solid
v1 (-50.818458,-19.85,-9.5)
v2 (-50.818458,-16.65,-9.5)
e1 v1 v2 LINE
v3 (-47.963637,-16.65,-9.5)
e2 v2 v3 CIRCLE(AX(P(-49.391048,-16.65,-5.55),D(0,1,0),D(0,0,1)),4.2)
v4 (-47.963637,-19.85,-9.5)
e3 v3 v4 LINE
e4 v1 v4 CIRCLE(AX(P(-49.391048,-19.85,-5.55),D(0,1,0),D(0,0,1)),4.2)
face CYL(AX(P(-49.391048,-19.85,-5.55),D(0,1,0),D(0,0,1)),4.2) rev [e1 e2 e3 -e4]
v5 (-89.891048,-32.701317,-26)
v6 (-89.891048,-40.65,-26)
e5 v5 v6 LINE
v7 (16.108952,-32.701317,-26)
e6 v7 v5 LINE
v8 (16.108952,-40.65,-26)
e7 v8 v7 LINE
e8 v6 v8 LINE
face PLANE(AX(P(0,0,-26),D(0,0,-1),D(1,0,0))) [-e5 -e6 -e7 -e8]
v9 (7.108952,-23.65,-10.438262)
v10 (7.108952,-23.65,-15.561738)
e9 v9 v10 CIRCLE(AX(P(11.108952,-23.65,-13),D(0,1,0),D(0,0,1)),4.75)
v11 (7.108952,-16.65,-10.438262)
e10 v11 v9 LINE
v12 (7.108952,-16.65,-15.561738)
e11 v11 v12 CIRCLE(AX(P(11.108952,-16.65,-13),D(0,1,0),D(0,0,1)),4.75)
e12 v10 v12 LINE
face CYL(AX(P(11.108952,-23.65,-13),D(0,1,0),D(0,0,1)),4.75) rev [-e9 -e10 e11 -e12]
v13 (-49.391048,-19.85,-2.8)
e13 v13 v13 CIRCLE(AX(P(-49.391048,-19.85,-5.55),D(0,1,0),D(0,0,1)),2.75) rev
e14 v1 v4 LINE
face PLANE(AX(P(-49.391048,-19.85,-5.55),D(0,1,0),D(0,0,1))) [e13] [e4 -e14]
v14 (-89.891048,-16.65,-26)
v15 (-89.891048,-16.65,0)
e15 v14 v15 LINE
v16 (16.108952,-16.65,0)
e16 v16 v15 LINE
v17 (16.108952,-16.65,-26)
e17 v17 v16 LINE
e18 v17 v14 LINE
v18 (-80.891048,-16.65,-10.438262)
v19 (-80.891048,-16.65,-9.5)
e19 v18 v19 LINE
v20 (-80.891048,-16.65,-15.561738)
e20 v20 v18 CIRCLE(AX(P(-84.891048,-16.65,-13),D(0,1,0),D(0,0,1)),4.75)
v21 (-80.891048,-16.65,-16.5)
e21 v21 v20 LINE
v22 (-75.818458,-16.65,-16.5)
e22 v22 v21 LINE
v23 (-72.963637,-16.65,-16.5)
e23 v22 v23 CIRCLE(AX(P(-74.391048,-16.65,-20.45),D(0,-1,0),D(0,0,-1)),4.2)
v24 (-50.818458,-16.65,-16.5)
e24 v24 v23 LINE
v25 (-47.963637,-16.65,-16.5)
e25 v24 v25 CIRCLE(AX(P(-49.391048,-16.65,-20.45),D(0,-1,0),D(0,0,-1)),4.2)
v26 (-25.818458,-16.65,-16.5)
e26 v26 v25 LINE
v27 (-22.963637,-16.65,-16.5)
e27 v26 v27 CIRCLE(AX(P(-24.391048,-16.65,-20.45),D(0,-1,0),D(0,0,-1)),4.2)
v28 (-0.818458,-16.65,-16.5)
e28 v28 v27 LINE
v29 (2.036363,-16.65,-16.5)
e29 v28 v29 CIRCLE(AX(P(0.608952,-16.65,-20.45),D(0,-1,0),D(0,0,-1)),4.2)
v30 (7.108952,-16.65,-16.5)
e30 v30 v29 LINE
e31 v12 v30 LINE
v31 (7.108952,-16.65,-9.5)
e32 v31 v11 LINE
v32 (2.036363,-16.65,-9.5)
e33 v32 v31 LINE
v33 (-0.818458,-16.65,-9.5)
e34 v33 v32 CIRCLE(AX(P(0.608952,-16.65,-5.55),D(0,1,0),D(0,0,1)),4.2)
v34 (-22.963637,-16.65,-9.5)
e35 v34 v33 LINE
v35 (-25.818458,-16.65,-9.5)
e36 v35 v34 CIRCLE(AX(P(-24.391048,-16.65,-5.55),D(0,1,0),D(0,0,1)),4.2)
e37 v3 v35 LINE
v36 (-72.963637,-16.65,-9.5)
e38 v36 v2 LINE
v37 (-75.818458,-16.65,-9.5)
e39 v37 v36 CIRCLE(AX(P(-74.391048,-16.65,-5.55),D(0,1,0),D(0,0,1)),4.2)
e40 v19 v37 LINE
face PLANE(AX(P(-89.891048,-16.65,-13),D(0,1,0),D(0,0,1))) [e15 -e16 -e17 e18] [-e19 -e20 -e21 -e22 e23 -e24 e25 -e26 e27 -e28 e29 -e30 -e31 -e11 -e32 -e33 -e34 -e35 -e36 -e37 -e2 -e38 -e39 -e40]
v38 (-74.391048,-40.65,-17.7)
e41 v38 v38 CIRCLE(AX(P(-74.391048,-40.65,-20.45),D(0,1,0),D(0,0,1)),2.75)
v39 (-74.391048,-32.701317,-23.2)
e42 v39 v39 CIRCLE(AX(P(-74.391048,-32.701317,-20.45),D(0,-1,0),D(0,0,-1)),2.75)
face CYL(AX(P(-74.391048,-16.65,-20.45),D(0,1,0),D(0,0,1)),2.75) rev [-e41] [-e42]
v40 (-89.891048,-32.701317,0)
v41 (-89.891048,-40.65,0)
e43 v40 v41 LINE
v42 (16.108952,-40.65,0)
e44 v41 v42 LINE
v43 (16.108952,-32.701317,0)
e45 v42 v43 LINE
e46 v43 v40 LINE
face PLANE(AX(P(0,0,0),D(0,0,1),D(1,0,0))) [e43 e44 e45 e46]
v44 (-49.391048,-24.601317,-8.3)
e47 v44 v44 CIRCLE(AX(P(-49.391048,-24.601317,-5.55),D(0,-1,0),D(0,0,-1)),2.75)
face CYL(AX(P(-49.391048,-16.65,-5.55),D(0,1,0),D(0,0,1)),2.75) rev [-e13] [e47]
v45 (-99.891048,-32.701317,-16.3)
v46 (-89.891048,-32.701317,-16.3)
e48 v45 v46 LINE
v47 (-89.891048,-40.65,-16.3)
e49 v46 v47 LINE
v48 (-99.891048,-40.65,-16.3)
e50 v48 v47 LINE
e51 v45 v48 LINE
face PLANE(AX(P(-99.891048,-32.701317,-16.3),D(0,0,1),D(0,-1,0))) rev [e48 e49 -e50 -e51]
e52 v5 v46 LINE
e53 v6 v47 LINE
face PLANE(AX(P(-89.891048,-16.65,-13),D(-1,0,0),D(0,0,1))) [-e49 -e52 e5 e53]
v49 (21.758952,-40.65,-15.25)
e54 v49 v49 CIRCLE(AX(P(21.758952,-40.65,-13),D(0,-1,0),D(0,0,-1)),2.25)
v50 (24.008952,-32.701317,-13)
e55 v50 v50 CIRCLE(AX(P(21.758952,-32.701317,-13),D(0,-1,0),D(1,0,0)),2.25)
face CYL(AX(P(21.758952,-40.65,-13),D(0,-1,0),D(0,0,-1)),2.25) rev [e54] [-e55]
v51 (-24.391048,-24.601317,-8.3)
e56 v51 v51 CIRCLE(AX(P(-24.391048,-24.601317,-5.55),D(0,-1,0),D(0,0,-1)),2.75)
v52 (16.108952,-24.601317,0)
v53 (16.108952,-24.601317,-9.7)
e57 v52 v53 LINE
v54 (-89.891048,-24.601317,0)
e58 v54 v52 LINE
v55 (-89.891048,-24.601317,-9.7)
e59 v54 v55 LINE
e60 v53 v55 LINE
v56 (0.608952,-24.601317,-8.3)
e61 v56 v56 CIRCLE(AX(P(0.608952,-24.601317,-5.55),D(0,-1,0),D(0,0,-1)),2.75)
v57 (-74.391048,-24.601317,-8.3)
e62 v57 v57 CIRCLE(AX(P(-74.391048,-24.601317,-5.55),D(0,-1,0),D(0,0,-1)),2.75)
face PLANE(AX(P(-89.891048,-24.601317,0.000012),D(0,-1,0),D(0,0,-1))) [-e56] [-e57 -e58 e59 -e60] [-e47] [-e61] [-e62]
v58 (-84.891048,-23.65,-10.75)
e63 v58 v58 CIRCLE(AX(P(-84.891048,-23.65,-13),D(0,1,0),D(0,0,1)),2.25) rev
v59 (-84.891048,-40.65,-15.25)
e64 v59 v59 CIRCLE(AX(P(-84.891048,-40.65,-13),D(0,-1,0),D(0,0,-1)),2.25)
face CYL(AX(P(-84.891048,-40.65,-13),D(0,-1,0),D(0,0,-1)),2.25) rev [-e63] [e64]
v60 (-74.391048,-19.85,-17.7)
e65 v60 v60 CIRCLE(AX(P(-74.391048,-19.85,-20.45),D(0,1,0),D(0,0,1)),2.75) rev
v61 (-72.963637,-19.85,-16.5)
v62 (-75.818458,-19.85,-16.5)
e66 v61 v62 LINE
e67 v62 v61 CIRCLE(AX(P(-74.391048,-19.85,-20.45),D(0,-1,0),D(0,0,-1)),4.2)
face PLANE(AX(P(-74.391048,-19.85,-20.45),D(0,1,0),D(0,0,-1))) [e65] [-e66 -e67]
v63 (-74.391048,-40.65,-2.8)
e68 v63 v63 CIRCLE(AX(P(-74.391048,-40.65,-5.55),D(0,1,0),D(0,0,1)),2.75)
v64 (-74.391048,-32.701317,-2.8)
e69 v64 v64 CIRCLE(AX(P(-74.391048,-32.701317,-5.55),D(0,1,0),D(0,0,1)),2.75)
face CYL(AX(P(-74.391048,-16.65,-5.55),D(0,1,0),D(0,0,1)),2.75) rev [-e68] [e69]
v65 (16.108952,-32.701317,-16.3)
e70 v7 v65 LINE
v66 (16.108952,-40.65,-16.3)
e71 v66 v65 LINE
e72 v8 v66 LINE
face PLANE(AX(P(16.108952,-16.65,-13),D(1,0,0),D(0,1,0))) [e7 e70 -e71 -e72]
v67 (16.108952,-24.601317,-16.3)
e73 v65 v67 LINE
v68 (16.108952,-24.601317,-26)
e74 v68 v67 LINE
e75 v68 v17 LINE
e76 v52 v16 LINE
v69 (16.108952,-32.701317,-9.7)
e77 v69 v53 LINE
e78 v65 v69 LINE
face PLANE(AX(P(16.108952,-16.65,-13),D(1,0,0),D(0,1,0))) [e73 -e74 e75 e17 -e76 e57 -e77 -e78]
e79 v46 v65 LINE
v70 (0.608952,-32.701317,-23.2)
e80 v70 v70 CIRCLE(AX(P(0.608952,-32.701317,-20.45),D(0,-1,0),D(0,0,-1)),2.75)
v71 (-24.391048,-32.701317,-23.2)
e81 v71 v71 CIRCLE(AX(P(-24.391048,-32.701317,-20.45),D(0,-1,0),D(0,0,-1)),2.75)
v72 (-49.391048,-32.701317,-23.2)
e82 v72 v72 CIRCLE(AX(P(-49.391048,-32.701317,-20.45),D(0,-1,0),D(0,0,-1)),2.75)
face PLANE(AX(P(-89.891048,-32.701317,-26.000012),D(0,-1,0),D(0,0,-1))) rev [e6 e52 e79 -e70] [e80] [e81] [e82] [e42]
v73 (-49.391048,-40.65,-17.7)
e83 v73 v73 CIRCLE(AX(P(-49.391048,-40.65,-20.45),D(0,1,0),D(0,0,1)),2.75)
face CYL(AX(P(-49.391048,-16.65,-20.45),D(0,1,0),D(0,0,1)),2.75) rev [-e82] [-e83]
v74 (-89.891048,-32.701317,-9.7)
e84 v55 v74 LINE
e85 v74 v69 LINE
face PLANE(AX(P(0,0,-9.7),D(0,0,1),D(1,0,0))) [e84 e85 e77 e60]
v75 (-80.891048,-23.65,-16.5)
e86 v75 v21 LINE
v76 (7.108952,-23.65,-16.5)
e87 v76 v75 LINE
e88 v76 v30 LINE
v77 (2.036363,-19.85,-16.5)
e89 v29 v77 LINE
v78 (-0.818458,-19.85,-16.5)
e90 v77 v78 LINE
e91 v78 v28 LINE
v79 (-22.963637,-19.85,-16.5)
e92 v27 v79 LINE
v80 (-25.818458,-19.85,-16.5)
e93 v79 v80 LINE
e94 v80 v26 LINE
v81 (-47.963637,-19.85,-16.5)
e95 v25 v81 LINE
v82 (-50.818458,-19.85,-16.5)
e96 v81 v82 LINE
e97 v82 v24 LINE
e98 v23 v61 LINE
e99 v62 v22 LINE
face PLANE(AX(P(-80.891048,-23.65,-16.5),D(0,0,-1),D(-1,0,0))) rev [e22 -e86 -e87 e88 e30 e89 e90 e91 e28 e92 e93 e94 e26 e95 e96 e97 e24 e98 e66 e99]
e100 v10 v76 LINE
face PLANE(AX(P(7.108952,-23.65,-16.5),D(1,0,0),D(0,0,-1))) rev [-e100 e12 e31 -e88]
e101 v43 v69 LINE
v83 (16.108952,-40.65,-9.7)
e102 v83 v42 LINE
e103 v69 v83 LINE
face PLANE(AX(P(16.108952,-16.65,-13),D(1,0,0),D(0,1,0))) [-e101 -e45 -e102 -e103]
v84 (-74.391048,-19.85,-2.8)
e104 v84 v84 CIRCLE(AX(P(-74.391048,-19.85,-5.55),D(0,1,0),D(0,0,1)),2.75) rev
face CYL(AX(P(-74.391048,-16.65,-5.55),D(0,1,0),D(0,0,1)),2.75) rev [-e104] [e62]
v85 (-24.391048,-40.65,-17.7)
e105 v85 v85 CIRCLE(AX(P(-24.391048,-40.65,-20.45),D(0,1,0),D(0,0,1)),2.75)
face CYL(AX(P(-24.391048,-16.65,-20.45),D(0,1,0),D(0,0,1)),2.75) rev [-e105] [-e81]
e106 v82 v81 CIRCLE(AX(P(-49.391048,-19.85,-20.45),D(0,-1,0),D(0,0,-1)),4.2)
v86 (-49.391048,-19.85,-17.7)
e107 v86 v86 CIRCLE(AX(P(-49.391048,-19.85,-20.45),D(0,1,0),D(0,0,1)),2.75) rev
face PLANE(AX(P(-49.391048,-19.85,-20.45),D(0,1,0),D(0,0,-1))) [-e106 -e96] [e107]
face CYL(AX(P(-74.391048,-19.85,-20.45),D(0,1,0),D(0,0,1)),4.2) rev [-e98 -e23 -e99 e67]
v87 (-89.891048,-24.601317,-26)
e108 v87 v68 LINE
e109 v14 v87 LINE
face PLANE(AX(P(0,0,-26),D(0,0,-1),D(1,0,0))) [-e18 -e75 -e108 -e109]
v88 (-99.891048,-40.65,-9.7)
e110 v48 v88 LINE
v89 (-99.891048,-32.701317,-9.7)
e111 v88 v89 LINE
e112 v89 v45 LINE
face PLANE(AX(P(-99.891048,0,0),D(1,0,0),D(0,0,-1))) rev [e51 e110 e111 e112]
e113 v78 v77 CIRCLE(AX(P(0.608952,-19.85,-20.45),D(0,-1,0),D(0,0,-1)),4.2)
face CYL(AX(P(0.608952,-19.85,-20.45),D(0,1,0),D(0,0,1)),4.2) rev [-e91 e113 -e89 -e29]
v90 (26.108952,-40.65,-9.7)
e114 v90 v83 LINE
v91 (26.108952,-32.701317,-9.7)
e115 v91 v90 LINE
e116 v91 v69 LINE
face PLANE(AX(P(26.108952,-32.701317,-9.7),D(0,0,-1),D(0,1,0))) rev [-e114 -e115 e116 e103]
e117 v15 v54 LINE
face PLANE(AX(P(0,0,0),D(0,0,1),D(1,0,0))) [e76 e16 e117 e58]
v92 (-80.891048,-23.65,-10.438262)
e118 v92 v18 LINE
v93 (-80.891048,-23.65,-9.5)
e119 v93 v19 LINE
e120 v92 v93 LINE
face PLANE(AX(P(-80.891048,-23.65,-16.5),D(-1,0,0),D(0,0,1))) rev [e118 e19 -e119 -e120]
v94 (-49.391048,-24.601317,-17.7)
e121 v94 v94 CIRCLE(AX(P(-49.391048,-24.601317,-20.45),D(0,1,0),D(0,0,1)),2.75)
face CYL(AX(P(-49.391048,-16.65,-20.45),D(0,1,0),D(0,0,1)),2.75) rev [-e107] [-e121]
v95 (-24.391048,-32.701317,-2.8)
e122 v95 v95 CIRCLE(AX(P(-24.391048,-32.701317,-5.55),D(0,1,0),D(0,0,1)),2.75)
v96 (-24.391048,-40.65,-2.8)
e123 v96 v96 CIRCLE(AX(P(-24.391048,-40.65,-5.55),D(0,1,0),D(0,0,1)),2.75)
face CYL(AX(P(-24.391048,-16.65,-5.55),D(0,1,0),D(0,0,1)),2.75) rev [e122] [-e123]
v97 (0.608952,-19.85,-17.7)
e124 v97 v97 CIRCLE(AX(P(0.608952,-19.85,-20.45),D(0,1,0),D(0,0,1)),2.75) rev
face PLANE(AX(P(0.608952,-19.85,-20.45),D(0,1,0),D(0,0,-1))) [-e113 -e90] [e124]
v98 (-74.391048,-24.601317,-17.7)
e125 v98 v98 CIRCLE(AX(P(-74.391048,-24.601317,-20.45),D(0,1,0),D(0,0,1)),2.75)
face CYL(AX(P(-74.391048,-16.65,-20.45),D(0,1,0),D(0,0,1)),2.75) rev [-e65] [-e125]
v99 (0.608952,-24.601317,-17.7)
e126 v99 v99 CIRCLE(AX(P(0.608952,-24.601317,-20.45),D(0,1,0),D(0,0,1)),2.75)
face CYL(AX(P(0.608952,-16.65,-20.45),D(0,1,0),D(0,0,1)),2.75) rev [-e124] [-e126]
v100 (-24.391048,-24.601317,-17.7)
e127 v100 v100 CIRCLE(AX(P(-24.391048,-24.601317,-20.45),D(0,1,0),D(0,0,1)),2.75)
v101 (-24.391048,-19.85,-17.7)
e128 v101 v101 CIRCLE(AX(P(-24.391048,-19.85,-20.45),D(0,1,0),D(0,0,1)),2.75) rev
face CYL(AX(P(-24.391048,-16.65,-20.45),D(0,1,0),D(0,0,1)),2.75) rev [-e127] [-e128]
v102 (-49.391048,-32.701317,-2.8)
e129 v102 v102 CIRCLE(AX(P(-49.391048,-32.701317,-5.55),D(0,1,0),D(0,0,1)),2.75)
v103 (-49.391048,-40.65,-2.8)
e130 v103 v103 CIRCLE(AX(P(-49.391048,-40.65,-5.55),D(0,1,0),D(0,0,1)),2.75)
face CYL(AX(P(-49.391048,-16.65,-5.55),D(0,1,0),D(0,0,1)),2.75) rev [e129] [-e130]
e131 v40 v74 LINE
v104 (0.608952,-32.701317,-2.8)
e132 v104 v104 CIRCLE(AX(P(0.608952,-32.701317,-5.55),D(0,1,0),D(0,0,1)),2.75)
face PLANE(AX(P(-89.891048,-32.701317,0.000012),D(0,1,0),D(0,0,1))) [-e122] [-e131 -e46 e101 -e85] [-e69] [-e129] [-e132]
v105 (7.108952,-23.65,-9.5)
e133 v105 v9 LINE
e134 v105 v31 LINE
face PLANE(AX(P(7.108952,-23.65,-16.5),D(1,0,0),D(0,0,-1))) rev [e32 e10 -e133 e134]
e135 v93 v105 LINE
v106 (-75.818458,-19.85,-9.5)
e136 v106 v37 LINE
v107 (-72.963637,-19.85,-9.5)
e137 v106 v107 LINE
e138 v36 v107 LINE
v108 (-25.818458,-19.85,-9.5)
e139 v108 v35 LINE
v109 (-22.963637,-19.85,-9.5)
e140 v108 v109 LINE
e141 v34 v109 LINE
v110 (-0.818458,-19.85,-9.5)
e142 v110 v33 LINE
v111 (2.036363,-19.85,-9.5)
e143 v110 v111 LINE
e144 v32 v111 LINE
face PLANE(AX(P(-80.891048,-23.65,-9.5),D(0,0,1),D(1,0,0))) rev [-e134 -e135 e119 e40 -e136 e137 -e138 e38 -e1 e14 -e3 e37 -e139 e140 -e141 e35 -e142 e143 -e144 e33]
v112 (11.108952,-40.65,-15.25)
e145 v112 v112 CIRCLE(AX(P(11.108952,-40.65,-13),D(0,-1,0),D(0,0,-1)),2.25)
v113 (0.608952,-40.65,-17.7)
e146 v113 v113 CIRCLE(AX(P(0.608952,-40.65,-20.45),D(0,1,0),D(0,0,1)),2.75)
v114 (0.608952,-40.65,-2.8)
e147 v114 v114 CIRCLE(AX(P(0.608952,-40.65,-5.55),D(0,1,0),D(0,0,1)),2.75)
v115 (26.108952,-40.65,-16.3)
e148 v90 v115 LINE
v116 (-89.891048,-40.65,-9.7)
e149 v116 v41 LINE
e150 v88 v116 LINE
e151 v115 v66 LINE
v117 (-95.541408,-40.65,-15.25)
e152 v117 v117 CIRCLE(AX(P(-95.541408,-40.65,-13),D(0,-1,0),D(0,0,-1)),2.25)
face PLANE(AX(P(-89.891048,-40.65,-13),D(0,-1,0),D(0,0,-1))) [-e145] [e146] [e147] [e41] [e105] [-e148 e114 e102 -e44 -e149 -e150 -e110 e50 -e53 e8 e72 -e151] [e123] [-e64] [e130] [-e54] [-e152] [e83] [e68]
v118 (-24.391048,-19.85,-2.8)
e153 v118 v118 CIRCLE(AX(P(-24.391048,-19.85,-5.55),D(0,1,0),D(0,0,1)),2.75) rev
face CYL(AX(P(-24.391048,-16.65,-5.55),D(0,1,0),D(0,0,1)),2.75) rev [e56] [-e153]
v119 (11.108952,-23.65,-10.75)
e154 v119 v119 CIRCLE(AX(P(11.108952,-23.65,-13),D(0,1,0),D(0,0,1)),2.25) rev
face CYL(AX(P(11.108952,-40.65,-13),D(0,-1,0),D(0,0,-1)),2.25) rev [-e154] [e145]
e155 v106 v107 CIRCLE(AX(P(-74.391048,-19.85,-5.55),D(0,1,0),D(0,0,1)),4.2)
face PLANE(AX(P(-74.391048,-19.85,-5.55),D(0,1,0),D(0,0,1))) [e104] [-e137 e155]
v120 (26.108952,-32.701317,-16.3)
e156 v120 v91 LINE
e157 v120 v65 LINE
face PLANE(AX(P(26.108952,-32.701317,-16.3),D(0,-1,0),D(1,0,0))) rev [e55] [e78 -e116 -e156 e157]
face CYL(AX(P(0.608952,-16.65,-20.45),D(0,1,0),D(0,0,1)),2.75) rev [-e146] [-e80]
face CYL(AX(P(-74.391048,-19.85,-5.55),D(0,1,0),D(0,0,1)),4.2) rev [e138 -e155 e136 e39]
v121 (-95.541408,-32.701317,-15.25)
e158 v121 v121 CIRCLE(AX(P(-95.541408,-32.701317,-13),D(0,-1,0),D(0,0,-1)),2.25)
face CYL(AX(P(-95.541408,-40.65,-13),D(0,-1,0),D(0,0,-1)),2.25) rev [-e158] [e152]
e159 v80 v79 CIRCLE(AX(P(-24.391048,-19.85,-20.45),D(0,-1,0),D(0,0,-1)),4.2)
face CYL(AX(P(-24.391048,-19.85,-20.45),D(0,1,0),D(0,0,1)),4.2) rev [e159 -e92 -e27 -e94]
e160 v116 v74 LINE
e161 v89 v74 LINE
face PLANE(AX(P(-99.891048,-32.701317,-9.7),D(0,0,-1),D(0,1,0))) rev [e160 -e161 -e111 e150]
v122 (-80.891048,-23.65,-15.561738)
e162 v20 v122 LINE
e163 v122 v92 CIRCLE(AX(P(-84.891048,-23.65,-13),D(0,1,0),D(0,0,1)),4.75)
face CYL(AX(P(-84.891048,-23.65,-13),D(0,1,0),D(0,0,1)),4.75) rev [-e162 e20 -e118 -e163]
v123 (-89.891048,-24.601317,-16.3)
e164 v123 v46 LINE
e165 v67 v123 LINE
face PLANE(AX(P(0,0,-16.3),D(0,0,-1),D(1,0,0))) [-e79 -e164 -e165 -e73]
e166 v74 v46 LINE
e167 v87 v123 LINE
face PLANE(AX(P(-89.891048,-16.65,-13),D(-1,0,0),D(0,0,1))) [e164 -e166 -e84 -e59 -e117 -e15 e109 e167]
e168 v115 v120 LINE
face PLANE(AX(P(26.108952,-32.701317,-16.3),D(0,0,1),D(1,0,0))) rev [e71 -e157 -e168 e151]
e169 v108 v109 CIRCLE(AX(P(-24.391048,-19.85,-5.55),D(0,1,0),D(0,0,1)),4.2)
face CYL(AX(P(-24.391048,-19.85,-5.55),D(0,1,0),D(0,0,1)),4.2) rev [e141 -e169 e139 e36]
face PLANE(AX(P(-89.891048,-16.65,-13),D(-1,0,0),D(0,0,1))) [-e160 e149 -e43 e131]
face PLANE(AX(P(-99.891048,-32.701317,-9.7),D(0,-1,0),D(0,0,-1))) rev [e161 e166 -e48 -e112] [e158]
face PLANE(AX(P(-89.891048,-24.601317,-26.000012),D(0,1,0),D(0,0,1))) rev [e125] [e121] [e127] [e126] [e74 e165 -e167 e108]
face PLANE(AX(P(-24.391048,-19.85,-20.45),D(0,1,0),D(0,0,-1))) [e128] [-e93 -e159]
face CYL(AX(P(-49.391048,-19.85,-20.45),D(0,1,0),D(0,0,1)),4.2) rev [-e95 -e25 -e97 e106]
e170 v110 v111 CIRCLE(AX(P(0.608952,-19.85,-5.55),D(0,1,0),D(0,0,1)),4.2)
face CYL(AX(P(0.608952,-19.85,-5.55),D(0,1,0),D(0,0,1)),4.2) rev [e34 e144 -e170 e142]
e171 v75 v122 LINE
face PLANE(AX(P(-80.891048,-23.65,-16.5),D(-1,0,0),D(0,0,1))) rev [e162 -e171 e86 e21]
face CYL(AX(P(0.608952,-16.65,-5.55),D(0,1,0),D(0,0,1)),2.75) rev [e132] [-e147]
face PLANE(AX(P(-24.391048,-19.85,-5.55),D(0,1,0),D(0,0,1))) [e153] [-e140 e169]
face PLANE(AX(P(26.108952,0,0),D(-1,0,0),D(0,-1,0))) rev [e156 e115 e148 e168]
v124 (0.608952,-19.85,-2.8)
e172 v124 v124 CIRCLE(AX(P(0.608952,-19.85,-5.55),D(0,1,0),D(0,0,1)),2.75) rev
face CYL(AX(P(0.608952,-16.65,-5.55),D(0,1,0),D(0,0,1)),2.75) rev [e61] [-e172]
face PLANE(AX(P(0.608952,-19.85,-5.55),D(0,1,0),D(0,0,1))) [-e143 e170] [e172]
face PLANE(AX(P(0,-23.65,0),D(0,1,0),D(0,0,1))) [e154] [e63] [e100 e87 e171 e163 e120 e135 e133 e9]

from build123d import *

# Parameters (mm, degrees)
SKETCH4_W                      = 106
SKETCH4_H                      = 24
BOSS_EXTRUDE2_DEPTH            = 13
CUT_EXTRUDE3_START             = -9.7
SKETCH25_W                     = 106
SKETCH25_H                     = 8.1
CUT_EXTRUDE3_DEPTH             = 110.207903902
M5_CLEARANCE_HOLE1_D           = 5.5
SKETCH39_R                     = 4.2
CUT_EXTRUDE5_DEPTH             = 3.2
MIRROR3_START                  = -40.65
MIRROR3_OUTLINE_W              = 106
MIRROR3_OUTLINE_H              = 13
MIRROR3_OUTLINE_R              = 2.75
MIRROR3_DEPTH                  = 7.948683024
MIRROR3_START_2                = -24.601316976
MIRROR3_2_OUTLINE_W            = 106
MIRROR3_2_OUTLINE_H            = 13
MIRROR3_2_OUTLINE_R            = 4.2
MIRROR3_2_DEPTH                = 7.951316976
MIRROR3_START_3                = -32.701316976
MIRROR3_3_OUTLINE_W            = 106
MIRROR3_3_OUTLINE_H            = 3.3
MIRROR3_3_DEPTH                = 12.851316976
MIRROR3_4_OUTLINE_R            = 2.75
MIRROR3_4_DEPTH                = 4.751316976
M4_CLEARANCE_HOLE2_D           = 4.5
SKETCH31_W                     = 88
SKETCH31_H                     = 7
CUT_EXTRUDE4_DEPTH             = 7
SKETCH32_W                     = 6.6
SKETCH32_H                     = 7.948683024
BOSS_EXTRUDE3_DEPTH            = 10
SKETCH37_W                     = 6.6
SKETCH37_H                     = 7.948683024
BOSS_EXTRUDE4_DEPTH            = 10
M4_CLEARANCE_HOLE1_D           = 4.5
M4_CLEARANCE_HOLE1_ON_FACE_2_D = 4.5
SKETCH42_R                     = 4.75
CUT_EXTRUDE9_DEPTH             = 7
SKETCH43_R                     = 4.75
CUT_EXTRUDE10_DEPTH            = 7


# Read off the part's stored shape, not the designer's step: Mirror3
with BuildPart() as part:
    # Sketch4 → Boss-Extrude2 (new body)
    with BuildSketch(Plane.XY):
        with Locations((-36.891047602, -28.65)):
            Rectangle(SKETCH4_W, SKETCH4_H)
    extrude(amount=-BOSS_EXTRUDE2_DEPTH)

    # Sketch25 → Cut-Extrude3 (cut)
    with BuildSketch(Plane.XY.offset(CUT_EXTRUDE3_START)):
        with Locations((-36.891047602, -28.651316976)):
            Rectangle(SKETCH25_W, SKETCH25_H)
    extrude(amount=CUT_EXTRUDE3_DEPTH, mode=Mode.SUBTRACT)

    # M5 Clearance Hole1 (through all)
    with Locations(Plane(origin=(-74.391047602, -16.65, -5.55), x_dir=(0, 0, 1), z_dir=(0, 1, 0))):
        with Locations((0, 0), (0, 25), (0, 75), (0, 50)):
            Hole(M5_CLEARANCE_HOLE1_D / 2)

    # Sketch39 → Cut-Extrude5 (cut)
    with BuildSketch(Plane(origin=(0, -16.65, 0), x_dir=(1, 0, 0), z_dir=(0, 1, 0))):
        with Locations(Location((0.608952398, 5.55, 0), (0, 0, 270))):
            Circle(SKETCH39_R)
        with Locations(Location((-24.391047602, 5.55, 0), (0, 0, 270))):
            Circle(SKETCH39_R)
        with Locations(Location((-49.391047602, 5.55, 0), (0, 0, 270))):
            Circle(SKETCH39_R)
        with Locations(Location((-74.391047602, 5.55, 0), (0, 0, 270))):
            Circle(SKETCH39_R)
    extrude(amount=-CUT_EXTRUDE5_DEPTH, mode=Mode.SUBTRACT)

    # Mirror3 outline → Mirror3 (add)
    with BuildSketch(Plane(origin=(0, 0, 0), x_dir=(1, 0, 0), z_dir=(0, 1, 0)).offset(MIRROR3_START)):
        with Locations((-36.891047602, 19.5)):
            Rectangle(MIRROR3_OUTLINE_W, MIRROR3_OUTLINE_H)
        with Locations((0.608952398, 20.45)):
            Circle(MIRROR3_OUTLINE_R, mode=Mode.SUBTRACT)
        with Locations((-24.391047602, 20.45)):
            Circle(MIRROR3_OUTLINE_R, mode=Mode.SUBTRACT)
        with Locations((-49.391047602, 20.45)):
            Circle(MIRROR3_OUTLINE_R, mode=Mode.SUBTRACT)
        with Locations((-74.391047602, 20.45)):
            Circle(MIRROR3_OUTLINE_R, mode=Mode.SUBTRACT)
    extrude(amount=MIRROR3_DEPTH)

    # Mirror3 2 outline → Mirror3 2 (add)
    with BuildSketch(Plane(origin=(0, 0, 0), x_dir=(1, 0, 0), z_dir=(0, 1, 0)).offset(MIRROR3_START_2)):
        with Locations((-36.891047602, 19.5)):
            Rectangle(MIRROR3_2_OUTLINE_W, MIRROR3_2_OUTLINE_H)
        with Locations((0.608952398, 20.45)):
            Circle(MIRROR3_2_OUTLINE_R, mode=Mode.SUBTRACT)
        with Locations((-24.391047602, 20.45)):
            Circle(MIRROR3_2_OUTLINE_R, mode=Mode.SUBTRACT)
        with Locations((-49.391047602, 20.45)):
            Circle(MIRROR3_2_OUTLINE_R, mode=Mode.SUBTRACT)
        with Locations((-74.391047602, 20.45)):
            Circle(MIRROR3_2_OUTLINE_R, mode=Mode.SUBTRACT)
    extrude(amount=MIRROR3_2_DEPTH)

    # Mirror3 3 outline → Mirror3 3 (add)
    with BuildSketch(Plane(origin=(0, 0, 0), x_dir=(1, 0, 0), z_dir=(0, 1, 0)).offset(MIRROR3_START_3)):
        with Locations((-36.891047602, 14.65)):
            Rectangle(MIRROR3_3_OUTLINE_W, MIRROR3_3_OUTLINE_H)
    extrude(amount=MIRROR3_3_DEPTH)

    # Mirror3 4 outline → Mirror3 4 (add)
    # profile 1 of 4: a face of its own
    with BuildSketch(Plane(origin=(0, 0, 0), x_dir=(1, 0, 0), z_dir=(0, 1, 0)).offset(MIRROR3_START_2)):
        with BuildLine():
            Line((-0.037190001, 16.3), (1.255094797, 16.3))
            ThreePointArc((1.255094797, 16.3), (0.608952398, 24.65), (-0.037190001, 16.3))
        make_face()
        with Locations((0.608952398, 20.45)):
            Circle(MIRROR3_4_OUTLINE_R, mode=Mode.SUBTRACT)
    # profile 2 of 4: a face of its own
    with BuildSketch(Plane(origin=(0, 0, 0), x_dir=(1, 0, 0), z_dir=(0, 1, 0)).offset(MIRROR3_START_2)):
        with BuildLine():
            ThreePointArc((-73.744905203, 16.3), (-74.391047602, 24.65), (-75.037190001, 16.3))
            Line((-75.037190001, 16.3), (-73.744905203, 16.3))
        make_face()
        with Locations((-74.391047602, 20.45)):
            Circle(MIRROR3_4_OUTLINE_R, mode=Mode.SUBTRACT)
    # profile 3 of 4: a face of its own
    with BuildSketch(Plane(origin=(0, 0, 0), x_dir=(1, 0, 0), z_dir=(0, 1, 0)).offset(MIRROR3_START_2)):
        with BuildLine():
            Line((-25.037190001, 16.3), (-23.744905203, 16.3))
            ThreePointArc((-23.744905203, 16.3), (-24.391047602, 24.65), (-25.037190001, 16.3))
        make_face()
        with Locations((-24.391047602, 20.45)):
            Circle(MIRROR3_4_OUTLINE_R, mode=Mode.SUBTRACT)
    # profile 4 of 4: a face of its own
    with BuildSketch(Plane(origin=(0, 0, 0), x_dir=(1, 0, 0), z_dir=(0, 1, 0)).offset(MIRROR3_START_2)):
        with BuildLine():
            ThreePointArc((-48.744905203, 16.3), (-49.391047602, 24.65), (-50.037190001, 16.3))
            Line((-50.037190001, 16.3), (-48.744905203, 16.3))
        make_face()
        with Locations((-49.391047602, 20.45)):
            Circle(MIRROR3_4_OUTLINE_R, mode=Mode.SUBTRACT)
    extrude(amount=MIRROR3_4_DEPTH)

    # M4 Clearance Hole2 (through all)
    with Locations(Plane(origin=(11.108952398, -40.65, -13), x_dir=(0, 0, -1), z_dir=(0, -1, 0))):
        with Locations((0, 0), (0, -96)):
            Hole(M4_CLEARANCE_HOLE2_D / 2)

    # Sketch31 → Cut-Extrude4 (cut)
    with BuildSketch(Plane(origin=(0, -16.65, 0), x_dir=(1, 0, 0), z_dir=(0, 1, 0))):
        with Locations((-36.891047602, 13)):
            Rectangle(SKETCH31_W, SKETCH31_H)
    extrude(amount=-CUT_EXTRUDE4_DEPTH, mode=Mode.SUBTRACT)

    # Sketch32 → Boss-Extrude3 (add)
    with BuildSketch(Plane.ZY.offset(89.891047602)):
        with Locations((-13, -36.675658488)):
            Rectangle(SKETCH32_W, SKETCH32_H)
    extrude(amount=BOSS_EXTRUDE3_DEPTH)

    # Sketch37 → Boss-Extrude4 (add)
    with BuildSketch(Plane(origin=(16.108952398, 0, 0), x_dir=(0, 0, -1), z_dir=(1, 0, 0))):
        with Locations((13, -36.675658488)):
            Rectangle(SKETCH37_W, SKETCH37_H)
    extrude(amount=BOSS_EXTRUDE4_DEPTH)

    # M4 Clearance Hole1 (through all)
    with Locations(Plane(origin=(-95.541407791, -40.65, -13), x_dir=(0, 0, -1), z_dir=(0, -1, 0))):
        with Locations((0, 0), (0, 117.300360189)):
            Hole(M4_CLEARANCE_HOLE1_D / 2)

    # M4 Clearance Hole1 on face 2 (through all)
    with Locations(Plane(origin=(38.237961727, 0, -11.003941324), x_dir=(0, 0, -1), z_dir=(0, -1, 0))):
        with Locations((0, 0)):
            Hole(M4_CLEARANCE_HOLE1_ON_FACE_2_D / 2)

    # Sketch42 → Cut-Extrude9 (cut)
    with BuildSketch(Plane(origin=(0, -16.65, 0), x_dir=(1, 0, 0), z_dir=(0, 1, 0))):
        with Locations((11.108952398, 13)):
            Circle(SKETCH42_R)
    extrude(amount=-CUT_EXTRUDE9_DEPTH, mode=Mode.SUBTRACT)

    # Sketch43 → Cut-Extrude10 (cut)
    with BuildSketch(Plane(origin=(0, -16.65, 0), x_dir=(1, 0, 0), z_dir=(0, 1, 0))):
        with Locations((-84.891047602, 13)):
            Circle(SKETCH43_R)
    extrude(amount=-CUT_EXTRUDE10_DEPTH, mode=Mode.SUBTRACT)


solid = part.part
